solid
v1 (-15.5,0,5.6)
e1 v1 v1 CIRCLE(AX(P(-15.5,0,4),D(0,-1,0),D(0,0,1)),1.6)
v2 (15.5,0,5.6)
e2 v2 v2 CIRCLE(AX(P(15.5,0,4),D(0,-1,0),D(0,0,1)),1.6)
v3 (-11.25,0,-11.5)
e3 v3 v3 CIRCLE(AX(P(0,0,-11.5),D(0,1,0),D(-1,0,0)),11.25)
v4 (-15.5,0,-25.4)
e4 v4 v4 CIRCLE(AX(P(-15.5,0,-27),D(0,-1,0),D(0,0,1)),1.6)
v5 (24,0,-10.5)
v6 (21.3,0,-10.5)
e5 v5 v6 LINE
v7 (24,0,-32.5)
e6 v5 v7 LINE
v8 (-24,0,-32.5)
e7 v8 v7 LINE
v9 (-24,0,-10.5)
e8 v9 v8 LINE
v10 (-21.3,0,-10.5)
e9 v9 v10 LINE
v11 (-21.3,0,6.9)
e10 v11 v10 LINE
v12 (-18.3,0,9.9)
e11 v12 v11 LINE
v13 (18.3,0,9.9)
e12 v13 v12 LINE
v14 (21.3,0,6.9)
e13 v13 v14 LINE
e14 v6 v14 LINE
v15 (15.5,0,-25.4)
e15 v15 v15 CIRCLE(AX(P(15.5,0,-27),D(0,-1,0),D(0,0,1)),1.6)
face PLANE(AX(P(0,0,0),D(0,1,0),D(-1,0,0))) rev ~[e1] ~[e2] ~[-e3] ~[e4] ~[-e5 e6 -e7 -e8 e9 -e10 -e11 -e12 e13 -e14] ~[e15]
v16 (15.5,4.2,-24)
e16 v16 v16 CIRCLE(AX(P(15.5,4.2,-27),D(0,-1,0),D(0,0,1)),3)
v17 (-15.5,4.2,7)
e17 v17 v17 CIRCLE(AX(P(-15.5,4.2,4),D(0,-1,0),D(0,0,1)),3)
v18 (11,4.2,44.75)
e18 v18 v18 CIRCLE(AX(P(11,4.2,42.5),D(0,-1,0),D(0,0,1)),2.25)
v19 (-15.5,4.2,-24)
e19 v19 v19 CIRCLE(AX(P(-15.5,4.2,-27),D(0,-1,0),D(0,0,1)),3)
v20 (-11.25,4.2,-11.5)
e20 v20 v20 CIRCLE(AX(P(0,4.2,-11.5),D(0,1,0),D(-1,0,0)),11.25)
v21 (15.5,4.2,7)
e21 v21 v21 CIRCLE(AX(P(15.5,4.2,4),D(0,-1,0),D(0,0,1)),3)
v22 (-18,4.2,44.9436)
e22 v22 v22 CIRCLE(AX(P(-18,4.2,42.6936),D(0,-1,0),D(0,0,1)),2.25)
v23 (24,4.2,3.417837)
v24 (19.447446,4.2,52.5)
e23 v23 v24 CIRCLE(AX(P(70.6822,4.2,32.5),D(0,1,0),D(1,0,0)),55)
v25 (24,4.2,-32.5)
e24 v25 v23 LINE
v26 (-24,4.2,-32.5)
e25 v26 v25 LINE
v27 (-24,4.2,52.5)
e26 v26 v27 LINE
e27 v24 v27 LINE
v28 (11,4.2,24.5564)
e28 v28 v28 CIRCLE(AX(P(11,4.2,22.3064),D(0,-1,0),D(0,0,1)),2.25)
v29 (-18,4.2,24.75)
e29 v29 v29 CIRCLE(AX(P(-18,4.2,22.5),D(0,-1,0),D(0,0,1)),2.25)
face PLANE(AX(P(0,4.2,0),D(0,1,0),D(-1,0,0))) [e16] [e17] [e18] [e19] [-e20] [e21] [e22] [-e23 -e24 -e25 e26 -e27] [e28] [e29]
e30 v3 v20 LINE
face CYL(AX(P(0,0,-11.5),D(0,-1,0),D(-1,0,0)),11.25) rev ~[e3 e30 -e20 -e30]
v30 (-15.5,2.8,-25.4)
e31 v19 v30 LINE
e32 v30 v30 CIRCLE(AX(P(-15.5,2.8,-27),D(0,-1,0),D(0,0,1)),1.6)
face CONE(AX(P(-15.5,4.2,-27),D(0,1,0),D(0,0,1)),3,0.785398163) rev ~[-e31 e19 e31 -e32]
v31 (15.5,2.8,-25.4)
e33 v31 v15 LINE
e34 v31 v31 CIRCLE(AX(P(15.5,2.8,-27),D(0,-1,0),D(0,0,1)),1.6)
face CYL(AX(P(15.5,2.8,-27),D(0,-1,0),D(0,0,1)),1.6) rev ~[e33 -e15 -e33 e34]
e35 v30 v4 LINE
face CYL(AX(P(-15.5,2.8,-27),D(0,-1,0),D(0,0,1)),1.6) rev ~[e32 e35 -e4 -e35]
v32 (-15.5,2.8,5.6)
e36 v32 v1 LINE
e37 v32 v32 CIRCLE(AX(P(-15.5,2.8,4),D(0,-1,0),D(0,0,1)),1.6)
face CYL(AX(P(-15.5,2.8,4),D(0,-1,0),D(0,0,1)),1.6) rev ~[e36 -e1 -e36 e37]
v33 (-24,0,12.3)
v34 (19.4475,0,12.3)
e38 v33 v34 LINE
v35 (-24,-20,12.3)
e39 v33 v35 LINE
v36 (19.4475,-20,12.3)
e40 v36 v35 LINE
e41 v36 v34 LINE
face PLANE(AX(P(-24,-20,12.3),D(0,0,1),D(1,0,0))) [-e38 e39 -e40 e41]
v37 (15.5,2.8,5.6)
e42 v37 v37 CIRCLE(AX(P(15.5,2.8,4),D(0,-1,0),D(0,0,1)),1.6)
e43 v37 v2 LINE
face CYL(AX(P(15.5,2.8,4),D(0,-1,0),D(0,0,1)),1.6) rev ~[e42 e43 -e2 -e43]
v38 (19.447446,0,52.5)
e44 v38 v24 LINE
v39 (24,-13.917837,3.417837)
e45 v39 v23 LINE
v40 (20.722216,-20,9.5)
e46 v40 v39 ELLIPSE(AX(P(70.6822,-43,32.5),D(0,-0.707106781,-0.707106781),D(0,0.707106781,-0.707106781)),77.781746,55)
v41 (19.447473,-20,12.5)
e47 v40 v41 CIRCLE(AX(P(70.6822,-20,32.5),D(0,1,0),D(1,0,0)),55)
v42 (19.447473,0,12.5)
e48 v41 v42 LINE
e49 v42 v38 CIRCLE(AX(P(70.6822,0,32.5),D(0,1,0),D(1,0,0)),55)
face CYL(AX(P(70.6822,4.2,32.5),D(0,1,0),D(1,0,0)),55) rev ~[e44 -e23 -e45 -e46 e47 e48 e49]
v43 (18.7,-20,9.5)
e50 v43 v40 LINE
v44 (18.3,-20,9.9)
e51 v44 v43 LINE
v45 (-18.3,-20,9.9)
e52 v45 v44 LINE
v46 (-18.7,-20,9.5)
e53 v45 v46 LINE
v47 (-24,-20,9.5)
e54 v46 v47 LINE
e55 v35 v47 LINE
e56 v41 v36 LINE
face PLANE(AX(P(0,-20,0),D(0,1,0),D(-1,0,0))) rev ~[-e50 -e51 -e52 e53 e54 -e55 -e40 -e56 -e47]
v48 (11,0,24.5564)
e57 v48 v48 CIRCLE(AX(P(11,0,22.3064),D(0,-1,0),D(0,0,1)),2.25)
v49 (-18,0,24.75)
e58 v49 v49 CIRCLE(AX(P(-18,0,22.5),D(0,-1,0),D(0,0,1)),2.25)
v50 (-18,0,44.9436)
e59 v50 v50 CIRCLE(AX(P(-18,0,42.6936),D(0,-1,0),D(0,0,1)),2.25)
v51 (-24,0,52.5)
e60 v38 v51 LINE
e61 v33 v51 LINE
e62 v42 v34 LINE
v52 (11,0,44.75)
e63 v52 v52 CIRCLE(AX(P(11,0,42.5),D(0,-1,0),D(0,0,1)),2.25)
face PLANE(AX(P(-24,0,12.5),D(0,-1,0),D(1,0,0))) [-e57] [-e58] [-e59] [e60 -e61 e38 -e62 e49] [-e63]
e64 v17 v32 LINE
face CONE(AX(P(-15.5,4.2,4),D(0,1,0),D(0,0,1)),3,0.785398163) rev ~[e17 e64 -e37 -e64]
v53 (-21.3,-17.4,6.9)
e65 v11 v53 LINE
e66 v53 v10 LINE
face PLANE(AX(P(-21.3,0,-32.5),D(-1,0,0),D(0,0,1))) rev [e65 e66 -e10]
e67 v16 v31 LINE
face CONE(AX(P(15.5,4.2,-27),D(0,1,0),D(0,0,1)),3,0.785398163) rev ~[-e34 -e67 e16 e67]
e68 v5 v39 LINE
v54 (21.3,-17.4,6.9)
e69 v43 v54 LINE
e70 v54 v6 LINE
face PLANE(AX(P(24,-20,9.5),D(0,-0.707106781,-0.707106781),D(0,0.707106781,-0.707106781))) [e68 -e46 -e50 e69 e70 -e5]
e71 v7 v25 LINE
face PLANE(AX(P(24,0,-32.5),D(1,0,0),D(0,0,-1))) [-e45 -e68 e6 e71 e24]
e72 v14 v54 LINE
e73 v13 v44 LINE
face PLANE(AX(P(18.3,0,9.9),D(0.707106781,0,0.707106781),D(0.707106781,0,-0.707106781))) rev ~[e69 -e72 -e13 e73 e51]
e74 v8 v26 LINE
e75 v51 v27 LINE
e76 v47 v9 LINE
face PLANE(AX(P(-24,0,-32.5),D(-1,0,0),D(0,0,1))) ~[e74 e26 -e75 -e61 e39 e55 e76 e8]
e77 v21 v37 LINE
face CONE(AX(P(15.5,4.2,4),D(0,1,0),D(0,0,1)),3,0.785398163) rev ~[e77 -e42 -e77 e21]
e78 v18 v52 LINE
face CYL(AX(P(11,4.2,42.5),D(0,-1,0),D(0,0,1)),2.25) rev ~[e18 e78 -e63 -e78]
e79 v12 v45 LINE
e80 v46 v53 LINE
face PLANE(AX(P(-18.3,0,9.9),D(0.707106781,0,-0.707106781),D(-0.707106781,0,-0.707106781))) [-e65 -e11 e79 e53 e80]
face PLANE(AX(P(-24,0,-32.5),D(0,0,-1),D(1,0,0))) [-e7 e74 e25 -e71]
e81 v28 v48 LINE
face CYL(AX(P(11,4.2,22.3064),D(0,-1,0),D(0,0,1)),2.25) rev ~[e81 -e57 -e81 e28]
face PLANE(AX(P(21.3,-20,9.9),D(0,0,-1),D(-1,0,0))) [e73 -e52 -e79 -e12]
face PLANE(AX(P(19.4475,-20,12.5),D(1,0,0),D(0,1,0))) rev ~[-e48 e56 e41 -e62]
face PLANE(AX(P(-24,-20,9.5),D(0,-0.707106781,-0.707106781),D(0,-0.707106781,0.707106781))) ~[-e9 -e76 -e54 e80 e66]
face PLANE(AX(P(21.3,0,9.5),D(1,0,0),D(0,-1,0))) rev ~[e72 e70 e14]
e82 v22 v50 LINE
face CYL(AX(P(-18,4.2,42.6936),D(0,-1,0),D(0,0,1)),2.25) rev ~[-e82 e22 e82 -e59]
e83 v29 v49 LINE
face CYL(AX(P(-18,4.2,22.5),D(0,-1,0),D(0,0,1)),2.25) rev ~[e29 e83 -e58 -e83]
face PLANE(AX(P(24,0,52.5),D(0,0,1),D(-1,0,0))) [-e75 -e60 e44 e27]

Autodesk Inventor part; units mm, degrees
ref_plane "YZ Plane" through (0, 0, 0) normal (1, 0, 0) x (0, 1, 0)
ref_plane "XZ Plane" through (0, 0, 0) normal (0, 1, 0) x (-1, 0, 0)
ref_plane "XY Plane" through (0, 0, 0) normal (0, 0, 1) x (1, 0, 0)
sketch "Sketch1" plane through (0, 0, 0) normal (0, 1, 0) x (-1, 0, 0)
  line L0 (-24, 32.5) -> (24, 32.5)
  line L1 (24, 32.5) -> (24, -32.5)
  line L2 (24, -32.5) -> (-24, -32.5)
  line L3 (-24, -32.5) -> (-24, 32.5)
  line L4 (-24, 32.5) -> (24, -32.5) construction
  line L5 (24, 32.5) -> (-24, -32.5) construction
  line L6 (24, 9.5) -> (-24, 9.5)
  line L7 (-24, 9.5) -> (-24, -32.5)
  line L8 (-24, -32.5) -> (24, -32.5)
  line L9 (24, -32.5) -> (24, 9.5)
  circle A0 centre (0, -11.5) radius 11.25
  line L10 (24, 12.5) -> (-24, 12.5)
  line L11 (-24, 24.95) -> (-24, 20.05)
  line L12 (15.5, -27) -> (-15.5, -27) construction
  line L13 (-15.5, -27) -> (-15.5, 4) construction
  line L14 (-15.5, 4) -> (15.5, 4) construction
  line L15 (15.5, 4) -> (15.5, -27) construction
  line L16 (15.5, -27) -> (-15.5, 4) construction
  line L17 (-15.5, -27) -> (15.5, 4) construction
  line L18 (-24, 52.5) -> (24, 52.5)
  line L19 (24, 52.5) -> (24, 32.5)
  line L20 (24, 32.5) -> (-24, 32.5)
  line L21 (-24, 32.5) -> (-24, 52.5)
  point P0 (0, 0)
  point P1 (-21.1, 9.5)
  point P2 (21.1, 9.5)
  point P3 (18, 42.6936)
  point P4 (-11, 42.5)
  point P5 (18, 22.5)
  point P6 (-11, 22.3064)
  dimension "d0" = 48
  dimension "d1" = 65
  dimension "d2" = 20
  dimension "d3" = 3
  dimension "d4" = 2.9
  dimension "d5" = 2.9
  dimension "d6" = 22.5
  dimension "d35" = 31
  dimension "d36" = 31
  dimension "d71" = 20
  dimension "d73" = 6
  dimension "d74" = 6
  dimension "d82" = 35
  dimension "d83" = 35
extrude "Extrusion1" add sketch "Sketch1" along normal blind 4.2
sketch "Sketch2" plane through (0, 4.2, 0) normal (0, 1, 0) x (1, 0, 0)
  point P0 (0, 0)
  point P1 (11, -42.5)
  point P2 (11, -22.3064)
  point P3 (-18, -22.5)
  point P4 (-18, -42.6936)
hole "Hole5" at (11, 4.2, 42.5) at (-18, 4.2, 42.6936) at (11, 4.2, 22.3064) at (-18, 4.2, 22.5) direction (0, -1, 0) diameter 4.5 end through all
extrude "Extrusion3" add sketch "Sketch1" against normal blind 20 contours L1 L6 L3 L10
sketch "Sketch4" plane through (24, 0, -32.5) normal (1, 0, 0) x (0, 0, -1)
  line L0 (-42, -20) -> (-42, 0) projected
  line L1 (-42, -20) -> (-22, 0)
  line L2 (0, 0) -> (-42, 0) projected
  line L3 (-22, 0) -> (-42, 0)
  line L4 (-42, 0) -> (-42, -20)
  point P0 (-32.5, 0)
  dimension "d32" = 20
extrude "Extrusion4" add sketch "Sketch4" against normal blind 2.7
ref_plane "Work Plane1" through (0, 0, 52.5) normal (-1, 0, 0) x (0, 0, 1)
mirror "Mirror1" about plane through (0, 0, 52.5) normal (-1, 0, 0) of "Extrusion4"
sketch "Sketch5" plane through (0, 4.2, 0) normal (0, 1, 0) x (1, 0, 0)
  point P0 (0, 0)
  point P1 (-15.5, 27)
  point P2 (15.5, 27)
  point P3 (-15.5, -4)
  point P4 (15.5, -4)
hole "Hole4" at (-15.5, 4.2, -27) at (15.5, 4.2, -27) at (-15.5, 4.2, 4) at (15.5, 4.2, 4) direction (0, -1, 0) diameter 3.2 depth 8 tip angle 118 countersink diameter 6 countersink angle 90
sketch "Sketch6" plane through (21.3, -20, 9.5) normal (0, 0, -1) x (-1, 0, 0)
  line L0 (42.6, 0) -> (42.6, 20) projected
  line L1 (0, 20) -> (42.6, 20) projected
  line L2 (0, 20) -> (0, 0) projected
  line L3 (42.6, 0) -> (0, 0) projected
  point P0 (21.3, 20)
extrude "ajustement 0.2mm" cut sketch "Sketch6" against normal blind 0.4
sketch "Sketch7" plane through (0, 4.2, 0) normal (0, 1, 0) x (1, 0, 0)
  circle A0 centre (70.6822, -32.5) radius 55
  line L0 (21.3, -9.9) -> (-21.3, -9.9) construction
  line L1 (21.3, -9.9) -> (21.3, -51.2) construction
  line L2 (137, -22.5) -> (-72, -22.5) construction
  line L3 (0, -123.9517) -> (0, 131.2102) construction
  circle A1 centre (0, 11.5) radius 83.2585 construction
  line L4 (134.8387, -42.5) -> (-75.1613, -42.5) construction
  line L5 (134.8387, -32.5) -> (-75.1613, -32.5) construction
  point P0 (0, 0)
  dimension "d67" = 166.517
  dimension "d53" = 110
  dimension "d69" = 20
  dimension "d70" = 10
sketch "Sketch8" plane through (0, 0, 0) normal (0, -1, 0) x (1, 0, 0)
  line L0 (-21.3, 9.9) -> (21.3, 9.9) projected
  line L1 (21.3, -10.5) -> (21.3, 9.5) projected
  line L2 (-21.3, -10.5) -> (-21.3, 9.5) projected
  line L3 (21.3, 9.9) -> (-21.3, 9.9) projected
  line L4 (-18.3, 9.9) -> (-21.3, 6.9)
  line L5 (-21.3, 9.9) -> (-21.3, -10.5) projected
  line L6 (18.3, 9.9) -> (21.3, 6.9)
  line L7 (21.3, -10.5) -> (21.3, 9.9) projected
  point P0 (0, 0)
  dimension "d54" = 3
  dimension "d55" = 3
  dimension "d56" = 3
  dimension "d57" = 3
extrude "Extrusion6" add sketch "Sketch8" along normal blind 20
sketch "Sketch9" plane through (24, 0, -32.5) normal (1, 0, 0) x (0, 0, -1)
  line L0 (-39.4, -20) -> (-42, -20) projected
  line L1 (-39.4, -17.4) -> (-39.4, -20) projected
  line L2 (-42, -20) -> (-22, 0) projected
  point P0 (-32.5, 0)
extrude "Extrusion7" cut sketch "Sketch9" against normal through all
extrude "Extrusion8" cut sketch "Sketch7" against normal blind 30
sketch "Sketch10" plane through (-24, -20, 12.5) normal (0, 0, 1) x (1, 0, 0)
  line L0 (43.4475, 0) -> (43.4475, 20) projected
  line L1 (0, 20) -> (43.4475, 20) projected
  line L2 (0, 20) -> (0, 0) projected
  line L3 (43.4475, 0) -> (0, 0) projected
  point P0 (24, 20)
extrude "ajustement 0.2" cut sketch "Sketch10" against normal blind 0.2
equation "\"d5\" = d4"
equation "\"d74\" = d73"
equation "\"d83\" = d82"
equation "\"d55\" = d54"
equation "\"d56\" = d54"
equation "\"d57\" = d56"
properties part number "support_nema17_40mm"
